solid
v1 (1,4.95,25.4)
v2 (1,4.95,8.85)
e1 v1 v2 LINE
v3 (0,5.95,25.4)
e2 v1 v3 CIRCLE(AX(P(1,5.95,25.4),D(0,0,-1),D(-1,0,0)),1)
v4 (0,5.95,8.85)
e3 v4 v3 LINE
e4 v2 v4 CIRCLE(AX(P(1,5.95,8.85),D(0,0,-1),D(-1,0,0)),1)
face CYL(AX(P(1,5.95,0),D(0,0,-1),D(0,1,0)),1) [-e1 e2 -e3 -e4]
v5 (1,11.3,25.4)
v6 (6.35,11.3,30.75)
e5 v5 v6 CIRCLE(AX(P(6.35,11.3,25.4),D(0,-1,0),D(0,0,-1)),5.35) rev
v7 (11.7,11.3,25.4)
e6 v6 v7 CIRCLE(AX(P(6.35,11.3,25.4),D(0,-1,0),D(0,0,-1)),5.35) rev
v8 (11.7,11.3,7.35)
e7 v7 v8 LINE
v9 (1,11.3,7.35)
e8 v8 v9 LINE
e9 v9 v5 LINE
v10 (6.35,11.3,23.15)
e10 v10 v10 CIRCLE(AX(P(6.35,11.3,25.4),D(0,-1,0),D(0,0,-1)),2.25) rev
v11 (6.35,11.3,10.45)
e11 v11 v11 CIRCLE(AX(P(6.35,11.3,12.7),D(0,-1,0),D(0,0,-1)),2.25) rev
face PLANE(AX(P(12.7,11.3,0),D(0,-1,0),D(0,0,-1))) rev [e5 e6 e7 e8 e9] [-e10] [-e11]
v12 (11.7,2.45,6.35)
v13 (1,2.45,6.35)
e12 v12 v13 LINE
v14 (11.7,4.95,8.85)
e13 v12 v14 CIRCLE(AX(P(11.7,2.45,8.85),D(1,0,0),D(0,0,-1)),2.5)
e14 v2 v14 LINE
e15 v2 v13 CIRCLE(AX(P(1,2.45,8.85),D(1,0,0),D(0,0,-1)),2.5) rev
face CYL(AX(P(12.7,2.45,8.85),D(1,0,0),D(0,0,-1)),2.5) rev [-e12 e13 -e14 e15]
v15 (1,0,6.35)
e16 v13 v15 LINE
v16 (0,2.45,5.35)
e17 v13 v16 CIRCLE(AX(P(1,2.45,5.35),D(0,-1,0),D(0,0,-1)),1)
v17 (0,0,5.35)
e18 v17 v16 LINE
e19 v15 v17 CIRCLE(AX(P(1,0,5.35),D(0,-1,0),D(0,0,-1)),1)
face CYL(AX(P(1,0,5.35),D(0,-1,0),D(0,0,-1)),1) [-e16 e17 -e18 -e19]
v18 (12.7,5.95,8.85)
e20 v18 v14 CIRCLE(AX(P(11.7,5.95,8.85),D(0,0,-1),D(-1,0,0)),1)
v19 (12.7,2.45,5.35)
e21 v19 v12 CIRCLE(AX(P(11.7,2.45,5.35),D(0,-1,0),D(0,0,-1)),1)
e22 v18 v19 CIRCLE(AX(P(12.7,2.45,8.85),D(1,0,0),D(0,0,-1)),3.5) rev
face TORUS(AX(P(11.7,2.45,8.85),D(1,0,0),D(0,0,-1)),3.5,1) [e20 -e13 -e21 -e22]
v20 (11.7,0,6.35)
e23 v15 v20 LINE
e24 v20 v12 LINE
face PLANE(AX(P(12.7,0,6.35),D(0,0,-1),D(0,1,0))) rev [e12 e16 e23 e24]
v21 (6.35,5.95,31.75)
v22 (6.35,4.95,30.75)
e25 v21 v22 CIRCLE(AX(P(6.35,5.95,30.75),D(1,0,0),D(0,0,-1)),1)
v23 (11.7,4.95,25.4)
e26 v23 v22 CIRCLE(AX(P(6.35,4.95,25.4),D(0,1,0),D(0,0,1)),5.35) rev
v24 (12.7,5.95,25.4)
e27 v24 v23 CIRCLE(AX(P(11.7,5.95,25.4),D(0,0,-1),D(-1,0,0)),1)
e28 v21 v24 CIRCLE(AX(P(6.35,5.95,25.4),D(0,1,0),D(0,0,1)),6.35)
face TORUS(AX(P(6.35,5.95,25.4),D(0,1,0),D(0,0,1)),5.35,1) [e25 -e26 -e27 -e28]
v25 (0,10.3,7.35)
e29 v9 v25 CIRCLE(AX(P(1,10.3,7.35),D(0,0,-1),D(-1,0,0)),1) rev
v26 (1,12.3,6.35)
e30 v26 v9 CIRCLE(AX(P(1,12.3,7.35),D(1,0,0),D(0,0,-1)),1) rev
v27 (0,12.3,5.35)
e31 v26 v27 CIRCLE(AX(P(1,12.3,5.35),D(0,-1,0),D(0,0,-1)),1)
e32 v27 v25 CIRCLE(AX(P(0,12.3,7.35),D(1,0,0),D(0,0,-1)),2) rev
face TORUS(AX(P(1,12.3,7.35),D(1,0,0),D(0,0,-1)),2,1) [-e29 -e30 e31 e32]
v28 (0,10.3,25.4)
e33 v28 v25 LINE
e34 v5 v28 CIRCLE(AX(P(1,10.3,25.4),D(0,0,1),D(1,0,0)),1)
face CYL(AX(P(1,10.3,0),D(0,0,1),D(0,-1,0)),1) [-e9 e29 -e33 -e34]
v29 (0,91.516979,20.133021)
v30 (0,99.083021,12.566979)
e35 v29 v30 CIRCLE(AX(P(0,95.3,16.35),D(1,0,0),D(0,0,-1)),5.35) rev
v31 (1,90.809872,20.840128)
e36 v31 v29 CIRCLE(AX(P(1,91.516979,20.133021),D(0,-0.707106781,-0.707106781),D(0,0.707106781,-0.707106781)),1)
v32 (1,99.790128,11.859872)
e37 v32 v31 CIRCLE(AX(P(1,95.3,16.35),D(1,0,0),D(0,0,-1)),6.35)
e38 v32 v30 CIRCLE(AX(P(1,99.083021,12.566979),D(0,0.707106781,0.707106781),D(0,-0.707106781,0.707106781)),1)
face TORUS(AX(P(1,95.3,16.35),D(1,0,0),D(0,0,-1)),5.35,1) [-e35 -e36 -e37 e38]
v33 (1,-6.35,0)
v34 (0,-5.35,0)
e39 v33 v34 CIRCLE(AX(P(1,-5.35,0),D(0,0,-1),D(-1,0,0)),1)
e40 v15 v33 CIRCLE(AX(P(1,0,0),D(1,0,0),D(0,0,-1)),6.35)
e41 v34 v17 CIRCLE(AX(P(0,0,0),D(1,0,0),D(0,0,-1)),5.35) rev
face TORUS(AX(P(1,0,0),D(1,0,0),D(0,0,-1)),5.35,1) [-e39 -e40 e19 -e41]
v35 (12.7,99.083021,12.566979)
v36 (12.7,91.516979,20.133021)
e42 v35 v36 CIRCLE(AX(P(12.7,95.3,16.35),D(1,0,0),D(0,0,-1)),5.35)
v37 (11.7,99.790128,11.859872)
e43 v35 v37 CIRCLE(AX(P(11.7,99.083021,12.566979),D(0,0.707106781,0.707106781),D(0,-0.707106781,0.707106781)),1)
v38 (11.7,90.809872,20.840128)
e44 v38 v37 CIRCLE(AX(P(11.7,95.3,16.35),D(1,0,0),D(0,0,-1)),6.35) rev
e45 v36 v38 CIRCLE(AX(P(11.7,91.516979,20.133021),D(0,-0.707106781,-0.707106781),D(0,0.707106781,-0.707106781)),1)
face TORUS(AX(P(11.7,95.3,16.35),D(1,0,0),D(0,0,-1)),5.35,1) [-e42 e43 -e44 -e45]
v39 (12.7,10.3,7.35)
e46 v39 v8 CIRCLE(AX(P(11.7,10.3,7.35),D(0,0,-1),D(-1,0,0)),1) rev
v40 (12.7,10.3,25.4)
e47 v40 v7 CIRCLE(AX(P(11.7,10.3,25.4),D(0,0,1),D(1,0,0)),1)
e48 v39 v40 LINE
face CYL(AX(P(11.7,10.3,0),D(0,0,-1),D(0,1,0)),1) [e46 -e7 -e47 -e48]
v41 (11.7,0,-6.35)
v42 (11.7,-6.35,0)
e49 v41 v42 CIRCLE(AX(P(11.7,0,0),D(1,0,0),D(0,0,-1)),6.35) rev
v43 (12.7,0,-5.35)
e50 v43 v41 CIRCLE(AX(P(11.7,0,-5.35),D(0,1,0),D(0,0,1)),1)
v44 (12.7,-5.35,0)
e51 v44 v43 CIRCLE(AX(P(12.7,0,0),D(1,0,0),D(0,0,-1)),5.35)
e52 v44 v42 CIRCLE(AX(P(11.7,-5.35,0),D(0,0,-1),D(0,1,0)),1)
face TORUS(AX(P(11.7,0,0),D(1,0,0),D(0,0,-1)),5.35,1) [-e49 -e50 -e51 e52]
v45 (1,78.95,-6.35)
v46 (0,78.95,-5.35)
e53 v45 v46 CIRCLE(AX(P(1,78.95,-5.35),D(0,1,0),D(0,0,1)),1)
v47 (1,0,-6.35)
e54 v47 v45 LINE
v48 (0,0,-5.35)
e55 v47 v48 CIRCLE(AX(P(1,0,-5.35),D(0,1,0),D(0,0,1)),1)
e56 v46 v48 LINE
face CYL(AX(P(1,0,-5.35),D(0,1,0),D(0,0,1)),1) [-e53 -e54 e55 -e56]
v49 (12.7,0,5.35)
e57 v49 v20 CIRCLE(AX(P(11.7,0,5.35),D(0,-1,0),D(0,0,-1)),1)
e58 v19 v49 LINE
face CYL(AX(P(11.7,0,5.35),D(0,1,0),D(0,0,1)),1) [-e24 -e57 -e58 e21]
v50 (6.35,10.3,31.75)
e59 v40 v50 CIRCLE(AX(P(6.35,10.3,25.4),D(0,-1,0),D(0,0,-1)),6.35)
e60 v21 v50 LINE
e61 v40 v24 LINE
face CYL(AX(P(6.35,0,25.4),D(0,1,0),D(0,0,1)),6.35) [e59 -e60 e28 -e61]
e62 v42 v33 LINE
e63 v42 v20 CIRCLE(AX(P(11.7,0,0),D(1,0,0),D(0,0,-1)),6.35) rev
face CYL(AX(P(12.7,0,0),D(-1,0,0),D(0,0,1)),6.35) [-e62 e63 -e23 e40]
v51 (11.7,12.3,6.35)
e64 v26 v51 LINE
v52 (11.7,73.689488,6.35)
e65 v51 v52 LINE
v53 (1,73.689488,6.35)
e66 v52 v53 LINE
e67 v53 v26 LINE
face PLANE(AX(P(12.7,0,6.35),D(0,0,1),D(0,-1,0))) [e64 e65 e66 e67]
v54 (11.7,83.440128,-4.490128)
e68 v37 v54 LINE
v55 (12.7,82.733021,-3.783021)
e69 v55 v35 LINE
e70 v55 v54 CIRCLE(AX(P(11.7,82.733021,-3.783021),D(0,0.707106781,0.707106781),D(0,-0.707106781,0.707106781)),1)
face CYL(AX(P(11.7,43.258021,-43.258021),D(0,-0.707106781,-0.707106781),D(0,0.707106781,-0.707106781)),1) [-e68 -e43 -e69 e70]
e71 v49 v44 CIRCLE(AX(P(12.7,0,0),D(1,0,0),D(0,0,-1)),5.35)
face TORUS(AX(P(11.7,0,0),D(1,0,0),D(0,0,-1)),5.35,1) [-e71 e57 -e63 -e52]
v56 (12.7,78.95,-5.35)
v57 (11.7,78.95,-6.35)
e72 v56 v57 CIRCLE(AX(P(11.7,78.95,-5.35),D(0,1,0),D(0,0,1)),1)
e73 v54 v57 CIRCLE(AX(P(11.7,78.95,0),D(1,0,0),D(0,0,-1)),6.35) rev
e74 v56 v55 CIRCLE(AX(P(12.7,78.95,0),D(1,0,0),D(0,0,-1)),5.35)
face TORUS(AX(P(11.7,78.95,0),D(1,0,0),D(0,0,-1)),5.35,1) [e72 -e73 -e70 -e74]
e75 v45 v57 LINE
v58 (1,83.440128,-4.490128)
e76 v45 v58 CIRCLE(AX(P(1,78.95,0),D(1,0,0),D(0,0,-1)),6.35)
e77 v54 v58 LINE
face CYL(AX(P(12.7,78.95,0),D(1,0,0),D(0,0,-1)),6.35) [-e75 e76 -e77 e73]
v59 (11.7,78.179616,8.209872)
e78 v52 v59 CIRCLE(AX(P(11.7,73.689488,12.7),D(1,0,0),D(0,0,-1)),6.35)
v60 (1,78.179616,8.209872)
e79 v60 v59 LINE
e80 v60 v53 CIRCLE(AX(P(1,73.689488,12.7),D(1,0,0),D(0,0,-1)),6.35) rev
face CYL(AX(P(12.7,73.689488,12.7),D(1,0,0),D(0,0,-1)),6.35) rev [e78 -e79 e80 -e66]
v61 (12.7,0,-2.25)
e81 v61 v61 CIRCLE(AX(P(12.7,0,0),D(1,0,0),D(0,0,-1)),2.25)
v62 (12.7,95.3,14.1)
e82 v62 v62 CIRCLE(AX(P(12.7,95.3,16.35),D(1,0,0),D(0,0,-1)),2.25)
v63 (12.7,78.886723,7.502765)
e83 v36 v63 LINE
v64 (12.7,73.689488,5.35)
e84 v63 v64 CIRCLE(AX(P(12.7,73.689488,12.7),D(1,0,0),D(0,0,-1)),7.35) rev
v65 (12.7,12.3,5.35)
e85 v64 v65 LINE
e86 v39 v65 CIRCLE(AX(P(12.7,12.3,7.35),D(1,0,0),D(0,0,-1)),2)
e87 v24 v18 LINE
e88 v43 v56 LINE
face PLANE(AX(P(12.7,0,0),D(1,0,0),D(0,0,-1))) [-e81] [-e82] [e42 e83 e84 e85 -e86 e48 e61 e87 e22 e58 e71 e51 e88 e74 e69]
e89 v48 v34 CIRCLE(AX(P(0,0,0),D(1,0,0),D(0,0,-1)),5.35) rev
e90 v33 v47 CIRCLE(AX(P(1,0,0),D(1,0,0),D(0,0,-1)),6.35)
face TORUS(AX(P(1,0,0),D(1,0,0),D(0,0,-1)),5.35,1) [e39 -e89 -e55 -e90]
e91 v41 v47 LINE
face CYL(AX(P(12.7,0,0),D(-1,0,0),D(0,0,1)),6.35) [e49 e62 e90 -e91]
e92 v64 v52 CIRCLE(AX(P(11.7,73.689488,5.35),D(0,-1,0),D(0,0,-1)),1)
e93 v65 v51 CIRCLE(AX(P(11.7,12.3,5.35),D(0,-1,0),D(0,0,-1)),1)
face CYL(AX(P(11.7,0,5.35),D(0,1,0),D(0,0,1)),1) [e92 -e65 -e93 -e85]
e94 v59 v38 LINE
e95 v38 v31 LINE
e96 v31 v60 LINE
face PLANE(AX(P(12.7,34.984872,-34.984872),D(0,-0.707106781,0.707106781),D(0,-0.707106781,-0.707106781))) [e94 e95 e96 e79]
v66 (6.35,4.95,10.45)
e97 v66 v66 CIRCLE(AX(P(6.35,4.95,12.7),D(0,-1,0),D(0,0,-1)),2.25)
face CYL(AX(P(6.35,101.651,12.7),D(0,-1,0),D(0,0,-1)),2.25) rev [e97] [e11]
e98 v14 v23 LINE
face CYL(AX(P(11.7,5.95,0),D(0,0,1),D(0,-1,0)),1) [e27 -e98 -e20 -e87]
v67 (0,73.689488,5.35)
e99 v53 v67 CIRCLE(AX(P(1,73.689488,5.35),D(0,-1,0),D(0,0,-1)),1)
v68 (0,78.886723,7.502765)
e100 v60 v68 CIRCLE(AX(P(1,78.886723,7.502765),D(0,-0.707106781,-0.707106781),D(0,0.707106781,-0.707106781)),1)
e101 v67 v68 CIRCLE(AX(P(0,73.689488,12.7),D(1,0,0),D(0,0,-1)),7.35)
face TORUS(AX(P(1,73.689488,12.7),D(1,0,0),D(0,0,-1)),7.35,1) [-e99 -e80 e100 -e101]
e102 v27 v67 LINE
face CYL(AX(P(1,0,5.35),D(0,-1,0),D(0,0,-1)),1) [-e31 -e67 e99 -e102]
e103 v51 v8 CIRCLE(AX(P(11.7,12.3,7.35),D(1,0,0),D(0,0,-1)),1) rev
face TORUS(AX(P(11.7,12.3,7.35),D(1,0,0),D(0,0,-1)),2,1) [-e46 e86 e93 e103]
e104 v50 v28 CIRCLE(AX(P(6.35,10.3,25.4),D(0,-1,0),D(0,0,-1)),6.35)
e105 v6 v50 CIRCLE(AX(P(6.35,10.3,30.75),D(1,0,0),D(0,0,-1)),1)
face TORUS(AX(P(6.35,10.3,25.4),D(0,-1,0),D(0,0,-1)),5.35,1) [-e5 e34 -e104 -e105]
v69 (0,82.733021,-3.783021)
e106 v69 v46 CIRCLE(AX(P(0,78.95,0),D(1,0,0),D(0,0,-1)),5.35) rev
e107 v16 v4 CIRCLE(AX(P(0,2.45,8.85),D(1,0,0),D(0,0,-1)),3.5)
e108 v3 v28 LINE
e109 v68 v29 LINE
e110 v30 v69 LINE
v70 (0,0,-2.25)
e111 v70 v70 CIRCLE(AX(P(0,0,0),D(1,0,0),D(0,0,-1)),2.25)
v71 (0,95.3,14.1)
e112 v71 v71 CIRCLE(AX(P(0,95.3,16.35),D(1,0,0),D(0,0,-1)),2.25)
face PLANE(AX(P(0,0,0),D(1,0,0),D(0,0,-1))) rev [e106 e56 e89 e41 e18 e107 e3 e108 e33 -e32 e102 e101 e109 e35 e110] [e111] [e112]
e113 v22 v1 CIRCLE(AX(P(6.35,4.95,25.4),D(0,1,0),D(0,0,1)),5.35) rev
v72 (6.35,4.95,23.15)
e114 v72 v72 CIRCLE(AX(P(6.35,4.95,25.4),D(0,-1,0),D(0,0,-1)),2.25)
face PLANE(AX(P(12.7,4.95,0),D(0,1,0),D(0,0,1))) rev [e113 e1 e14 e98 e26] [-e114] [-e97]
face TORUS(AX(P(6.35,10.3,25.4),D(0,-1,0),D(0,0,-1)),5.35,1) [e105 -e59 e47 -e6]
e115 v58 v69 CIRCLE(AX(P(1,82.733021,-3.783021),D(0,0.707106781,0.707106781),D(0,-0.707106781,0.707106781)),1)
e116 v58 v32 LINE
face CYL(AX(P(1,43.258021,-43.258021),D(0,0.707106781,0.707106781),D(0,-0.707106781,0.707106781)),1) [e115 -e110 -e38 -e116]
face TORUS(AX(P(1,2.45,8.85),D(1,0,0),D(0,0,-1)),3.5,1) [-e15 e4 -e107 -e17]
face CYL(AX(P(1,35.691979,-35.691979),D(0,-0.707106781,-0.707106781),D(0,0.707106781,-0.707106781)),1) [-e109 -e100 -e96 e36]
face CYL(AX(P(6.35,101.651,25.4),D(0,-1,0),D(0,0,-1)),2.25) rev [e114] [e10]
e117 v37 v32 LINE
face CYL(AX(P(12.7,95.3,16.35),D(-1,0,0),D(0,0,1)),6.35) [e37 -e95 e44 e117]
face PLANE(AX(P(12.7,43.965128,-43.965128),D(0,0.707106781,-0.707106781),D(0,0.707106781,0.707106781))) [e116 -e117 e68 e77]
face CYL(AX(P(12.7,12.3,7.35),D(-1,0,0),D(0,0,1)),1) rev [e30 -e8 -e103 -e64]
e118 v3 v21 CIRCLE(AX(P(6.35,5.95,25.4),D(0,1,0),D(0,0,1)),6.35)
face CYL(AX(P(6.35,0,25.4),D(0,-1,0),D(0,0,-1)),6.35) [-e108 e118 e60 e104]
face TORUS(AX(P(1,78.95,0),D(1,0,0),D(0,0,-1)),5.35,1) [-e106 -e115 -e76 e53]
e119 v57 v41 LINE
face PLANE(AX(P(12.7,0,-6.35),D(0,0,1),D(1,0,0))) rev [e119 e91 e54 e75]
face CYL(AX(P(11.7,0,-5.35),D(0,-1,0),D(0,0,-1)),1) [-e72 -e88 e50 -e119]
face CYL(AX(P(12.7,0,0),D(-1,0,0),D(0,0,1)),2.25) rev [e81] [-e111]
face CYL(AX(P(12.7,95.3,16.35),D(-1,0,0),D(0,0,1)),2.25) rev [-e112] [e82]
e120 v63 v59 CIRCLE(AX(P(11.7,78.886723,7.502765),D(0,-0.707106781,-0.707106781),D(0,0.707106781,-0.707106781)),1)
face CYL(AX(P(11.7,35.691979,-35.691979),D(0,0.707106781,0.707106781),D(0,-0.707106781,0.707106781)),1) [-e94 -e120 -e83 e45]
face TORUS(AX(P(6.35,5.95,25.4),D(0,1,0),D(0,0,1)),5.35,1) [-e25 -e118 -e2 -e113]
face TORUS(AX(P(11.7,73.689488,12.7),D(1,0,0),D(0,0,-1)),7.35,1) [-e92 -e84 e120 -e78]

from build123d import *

# Parameters (mm, degrees)
SKETCH1_R           = 2.25
SKETCH1_R_2         = 6.35
BOSS_EXTRUDE1_DEPTH = 12.7
FILLET1_R           = 6.35
FILLET3_R           = 6.35
FILLET5_R           = 2.5
FILLET4_R           = 1
CUT_EXTRUDE1_REACH  = 104.568
SKETCH2_R           = 2.25


with BuildPart() as part:
    # Sketch1 → Boss-Extrude1 (new body)
    # profile 1 of 2: a face of its own
    with BuildSketch(Plane(origin=(0, 0, 0), x_dir=(0, 0, -1), z_dir=(1, 0, 0))):
        with BuildLine():
            Line((-6.35, 76.319743879), (-6.35, 11.3))
            Line((-6.35, 11.3), (-31.75, 11.3))
            Line((-31.75, 11.3), (-31.75, 4.95))
            Line((-31.75, 4.95), (-6.35, 4.95))
            Line((-6.35, 4.95), (-6.35, -6.35))
            Line((-6.35, -6.35), (6.35, -6.35))
            Line((6.35, -6.35), (6.35, 11.3))
            Line((6.35, 11.3), (6.35, 81.580256121))
            Line((6.35, 81.580256121), (-11.859871939, 99.790128061))
            ThreePointArc((-11.859871939, 99.790128061), (-10.483364969, 97.730039796), (-10, 95.3))
            ThreePointArc((-10, 95.3), (-13.919960204, 89.433364969), (-20.840128061, 90.809871939))
            Line((-20.840128061, 90.809871939), (-6.35, 76.319743879))
        make_face()
        Circle(SKETCH1_R, mode=Mode.SUBTRACT)
    # profile 2 of 2: a face of its own
    with BuildSketch(Plane(origin=(0, 0, 0), x_dir=(0, 0, -1), z_dir=(1, 0, 0))):
        with Locations((-16.35, 95.3)):
            Circle(SKETCH1_R_2)
        with Locations((-16.35, 95.3)):
            Circle(SKETCH1_R, mode=Mode.SUBTRACT)
    extrude(amount=BOSS_EXTRUDE1_DEPTH)

    # Fillet1
    fillet1_edges = [part.edges().sort_by_distance(p)[0] for p in [
        (6.35, 81.580256121, -6.35),
        (6.35, 76.319743879, 6.35),
        (6.35, -6.35, -6.35),
        (6.35, -6.35, 6.35),
    ]]
    fillet(fillet1_edges, radius=FILLET1_R - 0.0001)  # a hair under: the kernel refuses the full size

    # Fillet3
    fillet3_edges = [part.edges().sort_by_distance(p)[0] for p in [
        (0, 8.125, 31.75),
        (12.7, 8.125, 31.75),
    ]]
    fillet(fillet3_edges, radius=FILLET3_R - 0.0001)  # a hair under: the kernel refuses the full size

    # Fillet5
    fillet5_edges = [part.edges().sort_by_distance(p)[0] for p in [
        (6.35, 4.95, 6.35),
    ]]
    fillet(fillet5_edges, radius=FILLET5_R)

    # Fillet4
    fillet4_edges = [part.edges().sort_by_distance(p)[0] for p in [
        (12.7, 99.790128061, 20.840128061),
        (0, 11.3, 15.87505),
        (0, 42.49476459, 6.35),
        (0, 99.790128061, 20.840128061),
        (0, 91.615113416, 3.684857295),
        (12.7, 42.49476459, 6.35),
        (6.35, 11.3, 6.35),
        (12.7, 11.3, 15.87505),
        (0, 39.474970711, -6.35),
        (0, 84.494729234, 14.524985355),
        (0, -4.49015735, 4.49015735),
        (0, -4.49015735, -4.49015735),
        (0, 81.380042949, -5.866642643),
        (12.7, 39.474970711, -6.35),
        (12.7, 84.494729234, 14.524985355),
        (12.7, -4.49015735, 4.49015735),
        (12.7, -4.49015735, -4.49015735),
        (12.7, 81.380042949, -5.866642643),
        (0, 76.119530706, 6.833357357),
        (12.7, 76.119530706, 6.833357357),
        (0, 4.95, 17.12505),
        (12.7, 4.95, 17.12505),
        (10.84015735, 4.95, 29.89015735),
        (1.85984265, 4.95, 29.89015735),
        (10.84015735, 11.3, 29.89015735),
        (1.85984265, 11.3, 29.89015735),
        (12.7, 91.615113416, 3.684857295),
        (0, 1.22495, 6.35),
        (12.7, 1.22495, 6.35),
        (0, 4.217766953, 7.082233047),
        (12.7, 4.217766953, 7.082233047),
    ]]
    fillet(fillet4_edges, radius=FILLET4_R)

    # Sketch2 → Cut-Extrude1 (cut, up to next)
    with BuildSketch(Plane.XZ.offset(-4.95), mode=Mode.PRIVATE) as cut_extrude1_sk1:
        with Locations(Location((6.35, 12.7, 0), (0, 0, 270))):
            Circle(SKETCH2_R)
    cut_extrude1_tool1 = extrude(cut_extrude1_sk1.sketch, amount=-CUT_EXTRUDE1_REACH, mode=Mode.PRIVATE) & part.part
    # Sketch2 → Cut-Extrude1 (cut, up to next)
    with BuildSketch(Plane.XZ.offset(-4.95), mode=Mode.PRIVATE) as cut_extrude1_sk2:
        with Locations(Location((6.35, 25.4, 0), (0, 0, 270))):
            Circle(SKETCH2_R)
    cut_extrude1_tool2 = extrude(cut_extrude1_sk2.sketch, amount=-CUT_EXTRUDE1_REACH, mode=Mode.PRIVATE) & part.part
    add(cut_extrude1_tool1.solids().sort_by_distance((6.35, 4.95, 12.7))[0], mode=Mode.SUBTRACT)
    add(cut_extrude1_tool2.solids().sort_by_distance((6.35, 4.95, 25.4))[0], mode=Mode.SUBTRACT)


solid = part.part
